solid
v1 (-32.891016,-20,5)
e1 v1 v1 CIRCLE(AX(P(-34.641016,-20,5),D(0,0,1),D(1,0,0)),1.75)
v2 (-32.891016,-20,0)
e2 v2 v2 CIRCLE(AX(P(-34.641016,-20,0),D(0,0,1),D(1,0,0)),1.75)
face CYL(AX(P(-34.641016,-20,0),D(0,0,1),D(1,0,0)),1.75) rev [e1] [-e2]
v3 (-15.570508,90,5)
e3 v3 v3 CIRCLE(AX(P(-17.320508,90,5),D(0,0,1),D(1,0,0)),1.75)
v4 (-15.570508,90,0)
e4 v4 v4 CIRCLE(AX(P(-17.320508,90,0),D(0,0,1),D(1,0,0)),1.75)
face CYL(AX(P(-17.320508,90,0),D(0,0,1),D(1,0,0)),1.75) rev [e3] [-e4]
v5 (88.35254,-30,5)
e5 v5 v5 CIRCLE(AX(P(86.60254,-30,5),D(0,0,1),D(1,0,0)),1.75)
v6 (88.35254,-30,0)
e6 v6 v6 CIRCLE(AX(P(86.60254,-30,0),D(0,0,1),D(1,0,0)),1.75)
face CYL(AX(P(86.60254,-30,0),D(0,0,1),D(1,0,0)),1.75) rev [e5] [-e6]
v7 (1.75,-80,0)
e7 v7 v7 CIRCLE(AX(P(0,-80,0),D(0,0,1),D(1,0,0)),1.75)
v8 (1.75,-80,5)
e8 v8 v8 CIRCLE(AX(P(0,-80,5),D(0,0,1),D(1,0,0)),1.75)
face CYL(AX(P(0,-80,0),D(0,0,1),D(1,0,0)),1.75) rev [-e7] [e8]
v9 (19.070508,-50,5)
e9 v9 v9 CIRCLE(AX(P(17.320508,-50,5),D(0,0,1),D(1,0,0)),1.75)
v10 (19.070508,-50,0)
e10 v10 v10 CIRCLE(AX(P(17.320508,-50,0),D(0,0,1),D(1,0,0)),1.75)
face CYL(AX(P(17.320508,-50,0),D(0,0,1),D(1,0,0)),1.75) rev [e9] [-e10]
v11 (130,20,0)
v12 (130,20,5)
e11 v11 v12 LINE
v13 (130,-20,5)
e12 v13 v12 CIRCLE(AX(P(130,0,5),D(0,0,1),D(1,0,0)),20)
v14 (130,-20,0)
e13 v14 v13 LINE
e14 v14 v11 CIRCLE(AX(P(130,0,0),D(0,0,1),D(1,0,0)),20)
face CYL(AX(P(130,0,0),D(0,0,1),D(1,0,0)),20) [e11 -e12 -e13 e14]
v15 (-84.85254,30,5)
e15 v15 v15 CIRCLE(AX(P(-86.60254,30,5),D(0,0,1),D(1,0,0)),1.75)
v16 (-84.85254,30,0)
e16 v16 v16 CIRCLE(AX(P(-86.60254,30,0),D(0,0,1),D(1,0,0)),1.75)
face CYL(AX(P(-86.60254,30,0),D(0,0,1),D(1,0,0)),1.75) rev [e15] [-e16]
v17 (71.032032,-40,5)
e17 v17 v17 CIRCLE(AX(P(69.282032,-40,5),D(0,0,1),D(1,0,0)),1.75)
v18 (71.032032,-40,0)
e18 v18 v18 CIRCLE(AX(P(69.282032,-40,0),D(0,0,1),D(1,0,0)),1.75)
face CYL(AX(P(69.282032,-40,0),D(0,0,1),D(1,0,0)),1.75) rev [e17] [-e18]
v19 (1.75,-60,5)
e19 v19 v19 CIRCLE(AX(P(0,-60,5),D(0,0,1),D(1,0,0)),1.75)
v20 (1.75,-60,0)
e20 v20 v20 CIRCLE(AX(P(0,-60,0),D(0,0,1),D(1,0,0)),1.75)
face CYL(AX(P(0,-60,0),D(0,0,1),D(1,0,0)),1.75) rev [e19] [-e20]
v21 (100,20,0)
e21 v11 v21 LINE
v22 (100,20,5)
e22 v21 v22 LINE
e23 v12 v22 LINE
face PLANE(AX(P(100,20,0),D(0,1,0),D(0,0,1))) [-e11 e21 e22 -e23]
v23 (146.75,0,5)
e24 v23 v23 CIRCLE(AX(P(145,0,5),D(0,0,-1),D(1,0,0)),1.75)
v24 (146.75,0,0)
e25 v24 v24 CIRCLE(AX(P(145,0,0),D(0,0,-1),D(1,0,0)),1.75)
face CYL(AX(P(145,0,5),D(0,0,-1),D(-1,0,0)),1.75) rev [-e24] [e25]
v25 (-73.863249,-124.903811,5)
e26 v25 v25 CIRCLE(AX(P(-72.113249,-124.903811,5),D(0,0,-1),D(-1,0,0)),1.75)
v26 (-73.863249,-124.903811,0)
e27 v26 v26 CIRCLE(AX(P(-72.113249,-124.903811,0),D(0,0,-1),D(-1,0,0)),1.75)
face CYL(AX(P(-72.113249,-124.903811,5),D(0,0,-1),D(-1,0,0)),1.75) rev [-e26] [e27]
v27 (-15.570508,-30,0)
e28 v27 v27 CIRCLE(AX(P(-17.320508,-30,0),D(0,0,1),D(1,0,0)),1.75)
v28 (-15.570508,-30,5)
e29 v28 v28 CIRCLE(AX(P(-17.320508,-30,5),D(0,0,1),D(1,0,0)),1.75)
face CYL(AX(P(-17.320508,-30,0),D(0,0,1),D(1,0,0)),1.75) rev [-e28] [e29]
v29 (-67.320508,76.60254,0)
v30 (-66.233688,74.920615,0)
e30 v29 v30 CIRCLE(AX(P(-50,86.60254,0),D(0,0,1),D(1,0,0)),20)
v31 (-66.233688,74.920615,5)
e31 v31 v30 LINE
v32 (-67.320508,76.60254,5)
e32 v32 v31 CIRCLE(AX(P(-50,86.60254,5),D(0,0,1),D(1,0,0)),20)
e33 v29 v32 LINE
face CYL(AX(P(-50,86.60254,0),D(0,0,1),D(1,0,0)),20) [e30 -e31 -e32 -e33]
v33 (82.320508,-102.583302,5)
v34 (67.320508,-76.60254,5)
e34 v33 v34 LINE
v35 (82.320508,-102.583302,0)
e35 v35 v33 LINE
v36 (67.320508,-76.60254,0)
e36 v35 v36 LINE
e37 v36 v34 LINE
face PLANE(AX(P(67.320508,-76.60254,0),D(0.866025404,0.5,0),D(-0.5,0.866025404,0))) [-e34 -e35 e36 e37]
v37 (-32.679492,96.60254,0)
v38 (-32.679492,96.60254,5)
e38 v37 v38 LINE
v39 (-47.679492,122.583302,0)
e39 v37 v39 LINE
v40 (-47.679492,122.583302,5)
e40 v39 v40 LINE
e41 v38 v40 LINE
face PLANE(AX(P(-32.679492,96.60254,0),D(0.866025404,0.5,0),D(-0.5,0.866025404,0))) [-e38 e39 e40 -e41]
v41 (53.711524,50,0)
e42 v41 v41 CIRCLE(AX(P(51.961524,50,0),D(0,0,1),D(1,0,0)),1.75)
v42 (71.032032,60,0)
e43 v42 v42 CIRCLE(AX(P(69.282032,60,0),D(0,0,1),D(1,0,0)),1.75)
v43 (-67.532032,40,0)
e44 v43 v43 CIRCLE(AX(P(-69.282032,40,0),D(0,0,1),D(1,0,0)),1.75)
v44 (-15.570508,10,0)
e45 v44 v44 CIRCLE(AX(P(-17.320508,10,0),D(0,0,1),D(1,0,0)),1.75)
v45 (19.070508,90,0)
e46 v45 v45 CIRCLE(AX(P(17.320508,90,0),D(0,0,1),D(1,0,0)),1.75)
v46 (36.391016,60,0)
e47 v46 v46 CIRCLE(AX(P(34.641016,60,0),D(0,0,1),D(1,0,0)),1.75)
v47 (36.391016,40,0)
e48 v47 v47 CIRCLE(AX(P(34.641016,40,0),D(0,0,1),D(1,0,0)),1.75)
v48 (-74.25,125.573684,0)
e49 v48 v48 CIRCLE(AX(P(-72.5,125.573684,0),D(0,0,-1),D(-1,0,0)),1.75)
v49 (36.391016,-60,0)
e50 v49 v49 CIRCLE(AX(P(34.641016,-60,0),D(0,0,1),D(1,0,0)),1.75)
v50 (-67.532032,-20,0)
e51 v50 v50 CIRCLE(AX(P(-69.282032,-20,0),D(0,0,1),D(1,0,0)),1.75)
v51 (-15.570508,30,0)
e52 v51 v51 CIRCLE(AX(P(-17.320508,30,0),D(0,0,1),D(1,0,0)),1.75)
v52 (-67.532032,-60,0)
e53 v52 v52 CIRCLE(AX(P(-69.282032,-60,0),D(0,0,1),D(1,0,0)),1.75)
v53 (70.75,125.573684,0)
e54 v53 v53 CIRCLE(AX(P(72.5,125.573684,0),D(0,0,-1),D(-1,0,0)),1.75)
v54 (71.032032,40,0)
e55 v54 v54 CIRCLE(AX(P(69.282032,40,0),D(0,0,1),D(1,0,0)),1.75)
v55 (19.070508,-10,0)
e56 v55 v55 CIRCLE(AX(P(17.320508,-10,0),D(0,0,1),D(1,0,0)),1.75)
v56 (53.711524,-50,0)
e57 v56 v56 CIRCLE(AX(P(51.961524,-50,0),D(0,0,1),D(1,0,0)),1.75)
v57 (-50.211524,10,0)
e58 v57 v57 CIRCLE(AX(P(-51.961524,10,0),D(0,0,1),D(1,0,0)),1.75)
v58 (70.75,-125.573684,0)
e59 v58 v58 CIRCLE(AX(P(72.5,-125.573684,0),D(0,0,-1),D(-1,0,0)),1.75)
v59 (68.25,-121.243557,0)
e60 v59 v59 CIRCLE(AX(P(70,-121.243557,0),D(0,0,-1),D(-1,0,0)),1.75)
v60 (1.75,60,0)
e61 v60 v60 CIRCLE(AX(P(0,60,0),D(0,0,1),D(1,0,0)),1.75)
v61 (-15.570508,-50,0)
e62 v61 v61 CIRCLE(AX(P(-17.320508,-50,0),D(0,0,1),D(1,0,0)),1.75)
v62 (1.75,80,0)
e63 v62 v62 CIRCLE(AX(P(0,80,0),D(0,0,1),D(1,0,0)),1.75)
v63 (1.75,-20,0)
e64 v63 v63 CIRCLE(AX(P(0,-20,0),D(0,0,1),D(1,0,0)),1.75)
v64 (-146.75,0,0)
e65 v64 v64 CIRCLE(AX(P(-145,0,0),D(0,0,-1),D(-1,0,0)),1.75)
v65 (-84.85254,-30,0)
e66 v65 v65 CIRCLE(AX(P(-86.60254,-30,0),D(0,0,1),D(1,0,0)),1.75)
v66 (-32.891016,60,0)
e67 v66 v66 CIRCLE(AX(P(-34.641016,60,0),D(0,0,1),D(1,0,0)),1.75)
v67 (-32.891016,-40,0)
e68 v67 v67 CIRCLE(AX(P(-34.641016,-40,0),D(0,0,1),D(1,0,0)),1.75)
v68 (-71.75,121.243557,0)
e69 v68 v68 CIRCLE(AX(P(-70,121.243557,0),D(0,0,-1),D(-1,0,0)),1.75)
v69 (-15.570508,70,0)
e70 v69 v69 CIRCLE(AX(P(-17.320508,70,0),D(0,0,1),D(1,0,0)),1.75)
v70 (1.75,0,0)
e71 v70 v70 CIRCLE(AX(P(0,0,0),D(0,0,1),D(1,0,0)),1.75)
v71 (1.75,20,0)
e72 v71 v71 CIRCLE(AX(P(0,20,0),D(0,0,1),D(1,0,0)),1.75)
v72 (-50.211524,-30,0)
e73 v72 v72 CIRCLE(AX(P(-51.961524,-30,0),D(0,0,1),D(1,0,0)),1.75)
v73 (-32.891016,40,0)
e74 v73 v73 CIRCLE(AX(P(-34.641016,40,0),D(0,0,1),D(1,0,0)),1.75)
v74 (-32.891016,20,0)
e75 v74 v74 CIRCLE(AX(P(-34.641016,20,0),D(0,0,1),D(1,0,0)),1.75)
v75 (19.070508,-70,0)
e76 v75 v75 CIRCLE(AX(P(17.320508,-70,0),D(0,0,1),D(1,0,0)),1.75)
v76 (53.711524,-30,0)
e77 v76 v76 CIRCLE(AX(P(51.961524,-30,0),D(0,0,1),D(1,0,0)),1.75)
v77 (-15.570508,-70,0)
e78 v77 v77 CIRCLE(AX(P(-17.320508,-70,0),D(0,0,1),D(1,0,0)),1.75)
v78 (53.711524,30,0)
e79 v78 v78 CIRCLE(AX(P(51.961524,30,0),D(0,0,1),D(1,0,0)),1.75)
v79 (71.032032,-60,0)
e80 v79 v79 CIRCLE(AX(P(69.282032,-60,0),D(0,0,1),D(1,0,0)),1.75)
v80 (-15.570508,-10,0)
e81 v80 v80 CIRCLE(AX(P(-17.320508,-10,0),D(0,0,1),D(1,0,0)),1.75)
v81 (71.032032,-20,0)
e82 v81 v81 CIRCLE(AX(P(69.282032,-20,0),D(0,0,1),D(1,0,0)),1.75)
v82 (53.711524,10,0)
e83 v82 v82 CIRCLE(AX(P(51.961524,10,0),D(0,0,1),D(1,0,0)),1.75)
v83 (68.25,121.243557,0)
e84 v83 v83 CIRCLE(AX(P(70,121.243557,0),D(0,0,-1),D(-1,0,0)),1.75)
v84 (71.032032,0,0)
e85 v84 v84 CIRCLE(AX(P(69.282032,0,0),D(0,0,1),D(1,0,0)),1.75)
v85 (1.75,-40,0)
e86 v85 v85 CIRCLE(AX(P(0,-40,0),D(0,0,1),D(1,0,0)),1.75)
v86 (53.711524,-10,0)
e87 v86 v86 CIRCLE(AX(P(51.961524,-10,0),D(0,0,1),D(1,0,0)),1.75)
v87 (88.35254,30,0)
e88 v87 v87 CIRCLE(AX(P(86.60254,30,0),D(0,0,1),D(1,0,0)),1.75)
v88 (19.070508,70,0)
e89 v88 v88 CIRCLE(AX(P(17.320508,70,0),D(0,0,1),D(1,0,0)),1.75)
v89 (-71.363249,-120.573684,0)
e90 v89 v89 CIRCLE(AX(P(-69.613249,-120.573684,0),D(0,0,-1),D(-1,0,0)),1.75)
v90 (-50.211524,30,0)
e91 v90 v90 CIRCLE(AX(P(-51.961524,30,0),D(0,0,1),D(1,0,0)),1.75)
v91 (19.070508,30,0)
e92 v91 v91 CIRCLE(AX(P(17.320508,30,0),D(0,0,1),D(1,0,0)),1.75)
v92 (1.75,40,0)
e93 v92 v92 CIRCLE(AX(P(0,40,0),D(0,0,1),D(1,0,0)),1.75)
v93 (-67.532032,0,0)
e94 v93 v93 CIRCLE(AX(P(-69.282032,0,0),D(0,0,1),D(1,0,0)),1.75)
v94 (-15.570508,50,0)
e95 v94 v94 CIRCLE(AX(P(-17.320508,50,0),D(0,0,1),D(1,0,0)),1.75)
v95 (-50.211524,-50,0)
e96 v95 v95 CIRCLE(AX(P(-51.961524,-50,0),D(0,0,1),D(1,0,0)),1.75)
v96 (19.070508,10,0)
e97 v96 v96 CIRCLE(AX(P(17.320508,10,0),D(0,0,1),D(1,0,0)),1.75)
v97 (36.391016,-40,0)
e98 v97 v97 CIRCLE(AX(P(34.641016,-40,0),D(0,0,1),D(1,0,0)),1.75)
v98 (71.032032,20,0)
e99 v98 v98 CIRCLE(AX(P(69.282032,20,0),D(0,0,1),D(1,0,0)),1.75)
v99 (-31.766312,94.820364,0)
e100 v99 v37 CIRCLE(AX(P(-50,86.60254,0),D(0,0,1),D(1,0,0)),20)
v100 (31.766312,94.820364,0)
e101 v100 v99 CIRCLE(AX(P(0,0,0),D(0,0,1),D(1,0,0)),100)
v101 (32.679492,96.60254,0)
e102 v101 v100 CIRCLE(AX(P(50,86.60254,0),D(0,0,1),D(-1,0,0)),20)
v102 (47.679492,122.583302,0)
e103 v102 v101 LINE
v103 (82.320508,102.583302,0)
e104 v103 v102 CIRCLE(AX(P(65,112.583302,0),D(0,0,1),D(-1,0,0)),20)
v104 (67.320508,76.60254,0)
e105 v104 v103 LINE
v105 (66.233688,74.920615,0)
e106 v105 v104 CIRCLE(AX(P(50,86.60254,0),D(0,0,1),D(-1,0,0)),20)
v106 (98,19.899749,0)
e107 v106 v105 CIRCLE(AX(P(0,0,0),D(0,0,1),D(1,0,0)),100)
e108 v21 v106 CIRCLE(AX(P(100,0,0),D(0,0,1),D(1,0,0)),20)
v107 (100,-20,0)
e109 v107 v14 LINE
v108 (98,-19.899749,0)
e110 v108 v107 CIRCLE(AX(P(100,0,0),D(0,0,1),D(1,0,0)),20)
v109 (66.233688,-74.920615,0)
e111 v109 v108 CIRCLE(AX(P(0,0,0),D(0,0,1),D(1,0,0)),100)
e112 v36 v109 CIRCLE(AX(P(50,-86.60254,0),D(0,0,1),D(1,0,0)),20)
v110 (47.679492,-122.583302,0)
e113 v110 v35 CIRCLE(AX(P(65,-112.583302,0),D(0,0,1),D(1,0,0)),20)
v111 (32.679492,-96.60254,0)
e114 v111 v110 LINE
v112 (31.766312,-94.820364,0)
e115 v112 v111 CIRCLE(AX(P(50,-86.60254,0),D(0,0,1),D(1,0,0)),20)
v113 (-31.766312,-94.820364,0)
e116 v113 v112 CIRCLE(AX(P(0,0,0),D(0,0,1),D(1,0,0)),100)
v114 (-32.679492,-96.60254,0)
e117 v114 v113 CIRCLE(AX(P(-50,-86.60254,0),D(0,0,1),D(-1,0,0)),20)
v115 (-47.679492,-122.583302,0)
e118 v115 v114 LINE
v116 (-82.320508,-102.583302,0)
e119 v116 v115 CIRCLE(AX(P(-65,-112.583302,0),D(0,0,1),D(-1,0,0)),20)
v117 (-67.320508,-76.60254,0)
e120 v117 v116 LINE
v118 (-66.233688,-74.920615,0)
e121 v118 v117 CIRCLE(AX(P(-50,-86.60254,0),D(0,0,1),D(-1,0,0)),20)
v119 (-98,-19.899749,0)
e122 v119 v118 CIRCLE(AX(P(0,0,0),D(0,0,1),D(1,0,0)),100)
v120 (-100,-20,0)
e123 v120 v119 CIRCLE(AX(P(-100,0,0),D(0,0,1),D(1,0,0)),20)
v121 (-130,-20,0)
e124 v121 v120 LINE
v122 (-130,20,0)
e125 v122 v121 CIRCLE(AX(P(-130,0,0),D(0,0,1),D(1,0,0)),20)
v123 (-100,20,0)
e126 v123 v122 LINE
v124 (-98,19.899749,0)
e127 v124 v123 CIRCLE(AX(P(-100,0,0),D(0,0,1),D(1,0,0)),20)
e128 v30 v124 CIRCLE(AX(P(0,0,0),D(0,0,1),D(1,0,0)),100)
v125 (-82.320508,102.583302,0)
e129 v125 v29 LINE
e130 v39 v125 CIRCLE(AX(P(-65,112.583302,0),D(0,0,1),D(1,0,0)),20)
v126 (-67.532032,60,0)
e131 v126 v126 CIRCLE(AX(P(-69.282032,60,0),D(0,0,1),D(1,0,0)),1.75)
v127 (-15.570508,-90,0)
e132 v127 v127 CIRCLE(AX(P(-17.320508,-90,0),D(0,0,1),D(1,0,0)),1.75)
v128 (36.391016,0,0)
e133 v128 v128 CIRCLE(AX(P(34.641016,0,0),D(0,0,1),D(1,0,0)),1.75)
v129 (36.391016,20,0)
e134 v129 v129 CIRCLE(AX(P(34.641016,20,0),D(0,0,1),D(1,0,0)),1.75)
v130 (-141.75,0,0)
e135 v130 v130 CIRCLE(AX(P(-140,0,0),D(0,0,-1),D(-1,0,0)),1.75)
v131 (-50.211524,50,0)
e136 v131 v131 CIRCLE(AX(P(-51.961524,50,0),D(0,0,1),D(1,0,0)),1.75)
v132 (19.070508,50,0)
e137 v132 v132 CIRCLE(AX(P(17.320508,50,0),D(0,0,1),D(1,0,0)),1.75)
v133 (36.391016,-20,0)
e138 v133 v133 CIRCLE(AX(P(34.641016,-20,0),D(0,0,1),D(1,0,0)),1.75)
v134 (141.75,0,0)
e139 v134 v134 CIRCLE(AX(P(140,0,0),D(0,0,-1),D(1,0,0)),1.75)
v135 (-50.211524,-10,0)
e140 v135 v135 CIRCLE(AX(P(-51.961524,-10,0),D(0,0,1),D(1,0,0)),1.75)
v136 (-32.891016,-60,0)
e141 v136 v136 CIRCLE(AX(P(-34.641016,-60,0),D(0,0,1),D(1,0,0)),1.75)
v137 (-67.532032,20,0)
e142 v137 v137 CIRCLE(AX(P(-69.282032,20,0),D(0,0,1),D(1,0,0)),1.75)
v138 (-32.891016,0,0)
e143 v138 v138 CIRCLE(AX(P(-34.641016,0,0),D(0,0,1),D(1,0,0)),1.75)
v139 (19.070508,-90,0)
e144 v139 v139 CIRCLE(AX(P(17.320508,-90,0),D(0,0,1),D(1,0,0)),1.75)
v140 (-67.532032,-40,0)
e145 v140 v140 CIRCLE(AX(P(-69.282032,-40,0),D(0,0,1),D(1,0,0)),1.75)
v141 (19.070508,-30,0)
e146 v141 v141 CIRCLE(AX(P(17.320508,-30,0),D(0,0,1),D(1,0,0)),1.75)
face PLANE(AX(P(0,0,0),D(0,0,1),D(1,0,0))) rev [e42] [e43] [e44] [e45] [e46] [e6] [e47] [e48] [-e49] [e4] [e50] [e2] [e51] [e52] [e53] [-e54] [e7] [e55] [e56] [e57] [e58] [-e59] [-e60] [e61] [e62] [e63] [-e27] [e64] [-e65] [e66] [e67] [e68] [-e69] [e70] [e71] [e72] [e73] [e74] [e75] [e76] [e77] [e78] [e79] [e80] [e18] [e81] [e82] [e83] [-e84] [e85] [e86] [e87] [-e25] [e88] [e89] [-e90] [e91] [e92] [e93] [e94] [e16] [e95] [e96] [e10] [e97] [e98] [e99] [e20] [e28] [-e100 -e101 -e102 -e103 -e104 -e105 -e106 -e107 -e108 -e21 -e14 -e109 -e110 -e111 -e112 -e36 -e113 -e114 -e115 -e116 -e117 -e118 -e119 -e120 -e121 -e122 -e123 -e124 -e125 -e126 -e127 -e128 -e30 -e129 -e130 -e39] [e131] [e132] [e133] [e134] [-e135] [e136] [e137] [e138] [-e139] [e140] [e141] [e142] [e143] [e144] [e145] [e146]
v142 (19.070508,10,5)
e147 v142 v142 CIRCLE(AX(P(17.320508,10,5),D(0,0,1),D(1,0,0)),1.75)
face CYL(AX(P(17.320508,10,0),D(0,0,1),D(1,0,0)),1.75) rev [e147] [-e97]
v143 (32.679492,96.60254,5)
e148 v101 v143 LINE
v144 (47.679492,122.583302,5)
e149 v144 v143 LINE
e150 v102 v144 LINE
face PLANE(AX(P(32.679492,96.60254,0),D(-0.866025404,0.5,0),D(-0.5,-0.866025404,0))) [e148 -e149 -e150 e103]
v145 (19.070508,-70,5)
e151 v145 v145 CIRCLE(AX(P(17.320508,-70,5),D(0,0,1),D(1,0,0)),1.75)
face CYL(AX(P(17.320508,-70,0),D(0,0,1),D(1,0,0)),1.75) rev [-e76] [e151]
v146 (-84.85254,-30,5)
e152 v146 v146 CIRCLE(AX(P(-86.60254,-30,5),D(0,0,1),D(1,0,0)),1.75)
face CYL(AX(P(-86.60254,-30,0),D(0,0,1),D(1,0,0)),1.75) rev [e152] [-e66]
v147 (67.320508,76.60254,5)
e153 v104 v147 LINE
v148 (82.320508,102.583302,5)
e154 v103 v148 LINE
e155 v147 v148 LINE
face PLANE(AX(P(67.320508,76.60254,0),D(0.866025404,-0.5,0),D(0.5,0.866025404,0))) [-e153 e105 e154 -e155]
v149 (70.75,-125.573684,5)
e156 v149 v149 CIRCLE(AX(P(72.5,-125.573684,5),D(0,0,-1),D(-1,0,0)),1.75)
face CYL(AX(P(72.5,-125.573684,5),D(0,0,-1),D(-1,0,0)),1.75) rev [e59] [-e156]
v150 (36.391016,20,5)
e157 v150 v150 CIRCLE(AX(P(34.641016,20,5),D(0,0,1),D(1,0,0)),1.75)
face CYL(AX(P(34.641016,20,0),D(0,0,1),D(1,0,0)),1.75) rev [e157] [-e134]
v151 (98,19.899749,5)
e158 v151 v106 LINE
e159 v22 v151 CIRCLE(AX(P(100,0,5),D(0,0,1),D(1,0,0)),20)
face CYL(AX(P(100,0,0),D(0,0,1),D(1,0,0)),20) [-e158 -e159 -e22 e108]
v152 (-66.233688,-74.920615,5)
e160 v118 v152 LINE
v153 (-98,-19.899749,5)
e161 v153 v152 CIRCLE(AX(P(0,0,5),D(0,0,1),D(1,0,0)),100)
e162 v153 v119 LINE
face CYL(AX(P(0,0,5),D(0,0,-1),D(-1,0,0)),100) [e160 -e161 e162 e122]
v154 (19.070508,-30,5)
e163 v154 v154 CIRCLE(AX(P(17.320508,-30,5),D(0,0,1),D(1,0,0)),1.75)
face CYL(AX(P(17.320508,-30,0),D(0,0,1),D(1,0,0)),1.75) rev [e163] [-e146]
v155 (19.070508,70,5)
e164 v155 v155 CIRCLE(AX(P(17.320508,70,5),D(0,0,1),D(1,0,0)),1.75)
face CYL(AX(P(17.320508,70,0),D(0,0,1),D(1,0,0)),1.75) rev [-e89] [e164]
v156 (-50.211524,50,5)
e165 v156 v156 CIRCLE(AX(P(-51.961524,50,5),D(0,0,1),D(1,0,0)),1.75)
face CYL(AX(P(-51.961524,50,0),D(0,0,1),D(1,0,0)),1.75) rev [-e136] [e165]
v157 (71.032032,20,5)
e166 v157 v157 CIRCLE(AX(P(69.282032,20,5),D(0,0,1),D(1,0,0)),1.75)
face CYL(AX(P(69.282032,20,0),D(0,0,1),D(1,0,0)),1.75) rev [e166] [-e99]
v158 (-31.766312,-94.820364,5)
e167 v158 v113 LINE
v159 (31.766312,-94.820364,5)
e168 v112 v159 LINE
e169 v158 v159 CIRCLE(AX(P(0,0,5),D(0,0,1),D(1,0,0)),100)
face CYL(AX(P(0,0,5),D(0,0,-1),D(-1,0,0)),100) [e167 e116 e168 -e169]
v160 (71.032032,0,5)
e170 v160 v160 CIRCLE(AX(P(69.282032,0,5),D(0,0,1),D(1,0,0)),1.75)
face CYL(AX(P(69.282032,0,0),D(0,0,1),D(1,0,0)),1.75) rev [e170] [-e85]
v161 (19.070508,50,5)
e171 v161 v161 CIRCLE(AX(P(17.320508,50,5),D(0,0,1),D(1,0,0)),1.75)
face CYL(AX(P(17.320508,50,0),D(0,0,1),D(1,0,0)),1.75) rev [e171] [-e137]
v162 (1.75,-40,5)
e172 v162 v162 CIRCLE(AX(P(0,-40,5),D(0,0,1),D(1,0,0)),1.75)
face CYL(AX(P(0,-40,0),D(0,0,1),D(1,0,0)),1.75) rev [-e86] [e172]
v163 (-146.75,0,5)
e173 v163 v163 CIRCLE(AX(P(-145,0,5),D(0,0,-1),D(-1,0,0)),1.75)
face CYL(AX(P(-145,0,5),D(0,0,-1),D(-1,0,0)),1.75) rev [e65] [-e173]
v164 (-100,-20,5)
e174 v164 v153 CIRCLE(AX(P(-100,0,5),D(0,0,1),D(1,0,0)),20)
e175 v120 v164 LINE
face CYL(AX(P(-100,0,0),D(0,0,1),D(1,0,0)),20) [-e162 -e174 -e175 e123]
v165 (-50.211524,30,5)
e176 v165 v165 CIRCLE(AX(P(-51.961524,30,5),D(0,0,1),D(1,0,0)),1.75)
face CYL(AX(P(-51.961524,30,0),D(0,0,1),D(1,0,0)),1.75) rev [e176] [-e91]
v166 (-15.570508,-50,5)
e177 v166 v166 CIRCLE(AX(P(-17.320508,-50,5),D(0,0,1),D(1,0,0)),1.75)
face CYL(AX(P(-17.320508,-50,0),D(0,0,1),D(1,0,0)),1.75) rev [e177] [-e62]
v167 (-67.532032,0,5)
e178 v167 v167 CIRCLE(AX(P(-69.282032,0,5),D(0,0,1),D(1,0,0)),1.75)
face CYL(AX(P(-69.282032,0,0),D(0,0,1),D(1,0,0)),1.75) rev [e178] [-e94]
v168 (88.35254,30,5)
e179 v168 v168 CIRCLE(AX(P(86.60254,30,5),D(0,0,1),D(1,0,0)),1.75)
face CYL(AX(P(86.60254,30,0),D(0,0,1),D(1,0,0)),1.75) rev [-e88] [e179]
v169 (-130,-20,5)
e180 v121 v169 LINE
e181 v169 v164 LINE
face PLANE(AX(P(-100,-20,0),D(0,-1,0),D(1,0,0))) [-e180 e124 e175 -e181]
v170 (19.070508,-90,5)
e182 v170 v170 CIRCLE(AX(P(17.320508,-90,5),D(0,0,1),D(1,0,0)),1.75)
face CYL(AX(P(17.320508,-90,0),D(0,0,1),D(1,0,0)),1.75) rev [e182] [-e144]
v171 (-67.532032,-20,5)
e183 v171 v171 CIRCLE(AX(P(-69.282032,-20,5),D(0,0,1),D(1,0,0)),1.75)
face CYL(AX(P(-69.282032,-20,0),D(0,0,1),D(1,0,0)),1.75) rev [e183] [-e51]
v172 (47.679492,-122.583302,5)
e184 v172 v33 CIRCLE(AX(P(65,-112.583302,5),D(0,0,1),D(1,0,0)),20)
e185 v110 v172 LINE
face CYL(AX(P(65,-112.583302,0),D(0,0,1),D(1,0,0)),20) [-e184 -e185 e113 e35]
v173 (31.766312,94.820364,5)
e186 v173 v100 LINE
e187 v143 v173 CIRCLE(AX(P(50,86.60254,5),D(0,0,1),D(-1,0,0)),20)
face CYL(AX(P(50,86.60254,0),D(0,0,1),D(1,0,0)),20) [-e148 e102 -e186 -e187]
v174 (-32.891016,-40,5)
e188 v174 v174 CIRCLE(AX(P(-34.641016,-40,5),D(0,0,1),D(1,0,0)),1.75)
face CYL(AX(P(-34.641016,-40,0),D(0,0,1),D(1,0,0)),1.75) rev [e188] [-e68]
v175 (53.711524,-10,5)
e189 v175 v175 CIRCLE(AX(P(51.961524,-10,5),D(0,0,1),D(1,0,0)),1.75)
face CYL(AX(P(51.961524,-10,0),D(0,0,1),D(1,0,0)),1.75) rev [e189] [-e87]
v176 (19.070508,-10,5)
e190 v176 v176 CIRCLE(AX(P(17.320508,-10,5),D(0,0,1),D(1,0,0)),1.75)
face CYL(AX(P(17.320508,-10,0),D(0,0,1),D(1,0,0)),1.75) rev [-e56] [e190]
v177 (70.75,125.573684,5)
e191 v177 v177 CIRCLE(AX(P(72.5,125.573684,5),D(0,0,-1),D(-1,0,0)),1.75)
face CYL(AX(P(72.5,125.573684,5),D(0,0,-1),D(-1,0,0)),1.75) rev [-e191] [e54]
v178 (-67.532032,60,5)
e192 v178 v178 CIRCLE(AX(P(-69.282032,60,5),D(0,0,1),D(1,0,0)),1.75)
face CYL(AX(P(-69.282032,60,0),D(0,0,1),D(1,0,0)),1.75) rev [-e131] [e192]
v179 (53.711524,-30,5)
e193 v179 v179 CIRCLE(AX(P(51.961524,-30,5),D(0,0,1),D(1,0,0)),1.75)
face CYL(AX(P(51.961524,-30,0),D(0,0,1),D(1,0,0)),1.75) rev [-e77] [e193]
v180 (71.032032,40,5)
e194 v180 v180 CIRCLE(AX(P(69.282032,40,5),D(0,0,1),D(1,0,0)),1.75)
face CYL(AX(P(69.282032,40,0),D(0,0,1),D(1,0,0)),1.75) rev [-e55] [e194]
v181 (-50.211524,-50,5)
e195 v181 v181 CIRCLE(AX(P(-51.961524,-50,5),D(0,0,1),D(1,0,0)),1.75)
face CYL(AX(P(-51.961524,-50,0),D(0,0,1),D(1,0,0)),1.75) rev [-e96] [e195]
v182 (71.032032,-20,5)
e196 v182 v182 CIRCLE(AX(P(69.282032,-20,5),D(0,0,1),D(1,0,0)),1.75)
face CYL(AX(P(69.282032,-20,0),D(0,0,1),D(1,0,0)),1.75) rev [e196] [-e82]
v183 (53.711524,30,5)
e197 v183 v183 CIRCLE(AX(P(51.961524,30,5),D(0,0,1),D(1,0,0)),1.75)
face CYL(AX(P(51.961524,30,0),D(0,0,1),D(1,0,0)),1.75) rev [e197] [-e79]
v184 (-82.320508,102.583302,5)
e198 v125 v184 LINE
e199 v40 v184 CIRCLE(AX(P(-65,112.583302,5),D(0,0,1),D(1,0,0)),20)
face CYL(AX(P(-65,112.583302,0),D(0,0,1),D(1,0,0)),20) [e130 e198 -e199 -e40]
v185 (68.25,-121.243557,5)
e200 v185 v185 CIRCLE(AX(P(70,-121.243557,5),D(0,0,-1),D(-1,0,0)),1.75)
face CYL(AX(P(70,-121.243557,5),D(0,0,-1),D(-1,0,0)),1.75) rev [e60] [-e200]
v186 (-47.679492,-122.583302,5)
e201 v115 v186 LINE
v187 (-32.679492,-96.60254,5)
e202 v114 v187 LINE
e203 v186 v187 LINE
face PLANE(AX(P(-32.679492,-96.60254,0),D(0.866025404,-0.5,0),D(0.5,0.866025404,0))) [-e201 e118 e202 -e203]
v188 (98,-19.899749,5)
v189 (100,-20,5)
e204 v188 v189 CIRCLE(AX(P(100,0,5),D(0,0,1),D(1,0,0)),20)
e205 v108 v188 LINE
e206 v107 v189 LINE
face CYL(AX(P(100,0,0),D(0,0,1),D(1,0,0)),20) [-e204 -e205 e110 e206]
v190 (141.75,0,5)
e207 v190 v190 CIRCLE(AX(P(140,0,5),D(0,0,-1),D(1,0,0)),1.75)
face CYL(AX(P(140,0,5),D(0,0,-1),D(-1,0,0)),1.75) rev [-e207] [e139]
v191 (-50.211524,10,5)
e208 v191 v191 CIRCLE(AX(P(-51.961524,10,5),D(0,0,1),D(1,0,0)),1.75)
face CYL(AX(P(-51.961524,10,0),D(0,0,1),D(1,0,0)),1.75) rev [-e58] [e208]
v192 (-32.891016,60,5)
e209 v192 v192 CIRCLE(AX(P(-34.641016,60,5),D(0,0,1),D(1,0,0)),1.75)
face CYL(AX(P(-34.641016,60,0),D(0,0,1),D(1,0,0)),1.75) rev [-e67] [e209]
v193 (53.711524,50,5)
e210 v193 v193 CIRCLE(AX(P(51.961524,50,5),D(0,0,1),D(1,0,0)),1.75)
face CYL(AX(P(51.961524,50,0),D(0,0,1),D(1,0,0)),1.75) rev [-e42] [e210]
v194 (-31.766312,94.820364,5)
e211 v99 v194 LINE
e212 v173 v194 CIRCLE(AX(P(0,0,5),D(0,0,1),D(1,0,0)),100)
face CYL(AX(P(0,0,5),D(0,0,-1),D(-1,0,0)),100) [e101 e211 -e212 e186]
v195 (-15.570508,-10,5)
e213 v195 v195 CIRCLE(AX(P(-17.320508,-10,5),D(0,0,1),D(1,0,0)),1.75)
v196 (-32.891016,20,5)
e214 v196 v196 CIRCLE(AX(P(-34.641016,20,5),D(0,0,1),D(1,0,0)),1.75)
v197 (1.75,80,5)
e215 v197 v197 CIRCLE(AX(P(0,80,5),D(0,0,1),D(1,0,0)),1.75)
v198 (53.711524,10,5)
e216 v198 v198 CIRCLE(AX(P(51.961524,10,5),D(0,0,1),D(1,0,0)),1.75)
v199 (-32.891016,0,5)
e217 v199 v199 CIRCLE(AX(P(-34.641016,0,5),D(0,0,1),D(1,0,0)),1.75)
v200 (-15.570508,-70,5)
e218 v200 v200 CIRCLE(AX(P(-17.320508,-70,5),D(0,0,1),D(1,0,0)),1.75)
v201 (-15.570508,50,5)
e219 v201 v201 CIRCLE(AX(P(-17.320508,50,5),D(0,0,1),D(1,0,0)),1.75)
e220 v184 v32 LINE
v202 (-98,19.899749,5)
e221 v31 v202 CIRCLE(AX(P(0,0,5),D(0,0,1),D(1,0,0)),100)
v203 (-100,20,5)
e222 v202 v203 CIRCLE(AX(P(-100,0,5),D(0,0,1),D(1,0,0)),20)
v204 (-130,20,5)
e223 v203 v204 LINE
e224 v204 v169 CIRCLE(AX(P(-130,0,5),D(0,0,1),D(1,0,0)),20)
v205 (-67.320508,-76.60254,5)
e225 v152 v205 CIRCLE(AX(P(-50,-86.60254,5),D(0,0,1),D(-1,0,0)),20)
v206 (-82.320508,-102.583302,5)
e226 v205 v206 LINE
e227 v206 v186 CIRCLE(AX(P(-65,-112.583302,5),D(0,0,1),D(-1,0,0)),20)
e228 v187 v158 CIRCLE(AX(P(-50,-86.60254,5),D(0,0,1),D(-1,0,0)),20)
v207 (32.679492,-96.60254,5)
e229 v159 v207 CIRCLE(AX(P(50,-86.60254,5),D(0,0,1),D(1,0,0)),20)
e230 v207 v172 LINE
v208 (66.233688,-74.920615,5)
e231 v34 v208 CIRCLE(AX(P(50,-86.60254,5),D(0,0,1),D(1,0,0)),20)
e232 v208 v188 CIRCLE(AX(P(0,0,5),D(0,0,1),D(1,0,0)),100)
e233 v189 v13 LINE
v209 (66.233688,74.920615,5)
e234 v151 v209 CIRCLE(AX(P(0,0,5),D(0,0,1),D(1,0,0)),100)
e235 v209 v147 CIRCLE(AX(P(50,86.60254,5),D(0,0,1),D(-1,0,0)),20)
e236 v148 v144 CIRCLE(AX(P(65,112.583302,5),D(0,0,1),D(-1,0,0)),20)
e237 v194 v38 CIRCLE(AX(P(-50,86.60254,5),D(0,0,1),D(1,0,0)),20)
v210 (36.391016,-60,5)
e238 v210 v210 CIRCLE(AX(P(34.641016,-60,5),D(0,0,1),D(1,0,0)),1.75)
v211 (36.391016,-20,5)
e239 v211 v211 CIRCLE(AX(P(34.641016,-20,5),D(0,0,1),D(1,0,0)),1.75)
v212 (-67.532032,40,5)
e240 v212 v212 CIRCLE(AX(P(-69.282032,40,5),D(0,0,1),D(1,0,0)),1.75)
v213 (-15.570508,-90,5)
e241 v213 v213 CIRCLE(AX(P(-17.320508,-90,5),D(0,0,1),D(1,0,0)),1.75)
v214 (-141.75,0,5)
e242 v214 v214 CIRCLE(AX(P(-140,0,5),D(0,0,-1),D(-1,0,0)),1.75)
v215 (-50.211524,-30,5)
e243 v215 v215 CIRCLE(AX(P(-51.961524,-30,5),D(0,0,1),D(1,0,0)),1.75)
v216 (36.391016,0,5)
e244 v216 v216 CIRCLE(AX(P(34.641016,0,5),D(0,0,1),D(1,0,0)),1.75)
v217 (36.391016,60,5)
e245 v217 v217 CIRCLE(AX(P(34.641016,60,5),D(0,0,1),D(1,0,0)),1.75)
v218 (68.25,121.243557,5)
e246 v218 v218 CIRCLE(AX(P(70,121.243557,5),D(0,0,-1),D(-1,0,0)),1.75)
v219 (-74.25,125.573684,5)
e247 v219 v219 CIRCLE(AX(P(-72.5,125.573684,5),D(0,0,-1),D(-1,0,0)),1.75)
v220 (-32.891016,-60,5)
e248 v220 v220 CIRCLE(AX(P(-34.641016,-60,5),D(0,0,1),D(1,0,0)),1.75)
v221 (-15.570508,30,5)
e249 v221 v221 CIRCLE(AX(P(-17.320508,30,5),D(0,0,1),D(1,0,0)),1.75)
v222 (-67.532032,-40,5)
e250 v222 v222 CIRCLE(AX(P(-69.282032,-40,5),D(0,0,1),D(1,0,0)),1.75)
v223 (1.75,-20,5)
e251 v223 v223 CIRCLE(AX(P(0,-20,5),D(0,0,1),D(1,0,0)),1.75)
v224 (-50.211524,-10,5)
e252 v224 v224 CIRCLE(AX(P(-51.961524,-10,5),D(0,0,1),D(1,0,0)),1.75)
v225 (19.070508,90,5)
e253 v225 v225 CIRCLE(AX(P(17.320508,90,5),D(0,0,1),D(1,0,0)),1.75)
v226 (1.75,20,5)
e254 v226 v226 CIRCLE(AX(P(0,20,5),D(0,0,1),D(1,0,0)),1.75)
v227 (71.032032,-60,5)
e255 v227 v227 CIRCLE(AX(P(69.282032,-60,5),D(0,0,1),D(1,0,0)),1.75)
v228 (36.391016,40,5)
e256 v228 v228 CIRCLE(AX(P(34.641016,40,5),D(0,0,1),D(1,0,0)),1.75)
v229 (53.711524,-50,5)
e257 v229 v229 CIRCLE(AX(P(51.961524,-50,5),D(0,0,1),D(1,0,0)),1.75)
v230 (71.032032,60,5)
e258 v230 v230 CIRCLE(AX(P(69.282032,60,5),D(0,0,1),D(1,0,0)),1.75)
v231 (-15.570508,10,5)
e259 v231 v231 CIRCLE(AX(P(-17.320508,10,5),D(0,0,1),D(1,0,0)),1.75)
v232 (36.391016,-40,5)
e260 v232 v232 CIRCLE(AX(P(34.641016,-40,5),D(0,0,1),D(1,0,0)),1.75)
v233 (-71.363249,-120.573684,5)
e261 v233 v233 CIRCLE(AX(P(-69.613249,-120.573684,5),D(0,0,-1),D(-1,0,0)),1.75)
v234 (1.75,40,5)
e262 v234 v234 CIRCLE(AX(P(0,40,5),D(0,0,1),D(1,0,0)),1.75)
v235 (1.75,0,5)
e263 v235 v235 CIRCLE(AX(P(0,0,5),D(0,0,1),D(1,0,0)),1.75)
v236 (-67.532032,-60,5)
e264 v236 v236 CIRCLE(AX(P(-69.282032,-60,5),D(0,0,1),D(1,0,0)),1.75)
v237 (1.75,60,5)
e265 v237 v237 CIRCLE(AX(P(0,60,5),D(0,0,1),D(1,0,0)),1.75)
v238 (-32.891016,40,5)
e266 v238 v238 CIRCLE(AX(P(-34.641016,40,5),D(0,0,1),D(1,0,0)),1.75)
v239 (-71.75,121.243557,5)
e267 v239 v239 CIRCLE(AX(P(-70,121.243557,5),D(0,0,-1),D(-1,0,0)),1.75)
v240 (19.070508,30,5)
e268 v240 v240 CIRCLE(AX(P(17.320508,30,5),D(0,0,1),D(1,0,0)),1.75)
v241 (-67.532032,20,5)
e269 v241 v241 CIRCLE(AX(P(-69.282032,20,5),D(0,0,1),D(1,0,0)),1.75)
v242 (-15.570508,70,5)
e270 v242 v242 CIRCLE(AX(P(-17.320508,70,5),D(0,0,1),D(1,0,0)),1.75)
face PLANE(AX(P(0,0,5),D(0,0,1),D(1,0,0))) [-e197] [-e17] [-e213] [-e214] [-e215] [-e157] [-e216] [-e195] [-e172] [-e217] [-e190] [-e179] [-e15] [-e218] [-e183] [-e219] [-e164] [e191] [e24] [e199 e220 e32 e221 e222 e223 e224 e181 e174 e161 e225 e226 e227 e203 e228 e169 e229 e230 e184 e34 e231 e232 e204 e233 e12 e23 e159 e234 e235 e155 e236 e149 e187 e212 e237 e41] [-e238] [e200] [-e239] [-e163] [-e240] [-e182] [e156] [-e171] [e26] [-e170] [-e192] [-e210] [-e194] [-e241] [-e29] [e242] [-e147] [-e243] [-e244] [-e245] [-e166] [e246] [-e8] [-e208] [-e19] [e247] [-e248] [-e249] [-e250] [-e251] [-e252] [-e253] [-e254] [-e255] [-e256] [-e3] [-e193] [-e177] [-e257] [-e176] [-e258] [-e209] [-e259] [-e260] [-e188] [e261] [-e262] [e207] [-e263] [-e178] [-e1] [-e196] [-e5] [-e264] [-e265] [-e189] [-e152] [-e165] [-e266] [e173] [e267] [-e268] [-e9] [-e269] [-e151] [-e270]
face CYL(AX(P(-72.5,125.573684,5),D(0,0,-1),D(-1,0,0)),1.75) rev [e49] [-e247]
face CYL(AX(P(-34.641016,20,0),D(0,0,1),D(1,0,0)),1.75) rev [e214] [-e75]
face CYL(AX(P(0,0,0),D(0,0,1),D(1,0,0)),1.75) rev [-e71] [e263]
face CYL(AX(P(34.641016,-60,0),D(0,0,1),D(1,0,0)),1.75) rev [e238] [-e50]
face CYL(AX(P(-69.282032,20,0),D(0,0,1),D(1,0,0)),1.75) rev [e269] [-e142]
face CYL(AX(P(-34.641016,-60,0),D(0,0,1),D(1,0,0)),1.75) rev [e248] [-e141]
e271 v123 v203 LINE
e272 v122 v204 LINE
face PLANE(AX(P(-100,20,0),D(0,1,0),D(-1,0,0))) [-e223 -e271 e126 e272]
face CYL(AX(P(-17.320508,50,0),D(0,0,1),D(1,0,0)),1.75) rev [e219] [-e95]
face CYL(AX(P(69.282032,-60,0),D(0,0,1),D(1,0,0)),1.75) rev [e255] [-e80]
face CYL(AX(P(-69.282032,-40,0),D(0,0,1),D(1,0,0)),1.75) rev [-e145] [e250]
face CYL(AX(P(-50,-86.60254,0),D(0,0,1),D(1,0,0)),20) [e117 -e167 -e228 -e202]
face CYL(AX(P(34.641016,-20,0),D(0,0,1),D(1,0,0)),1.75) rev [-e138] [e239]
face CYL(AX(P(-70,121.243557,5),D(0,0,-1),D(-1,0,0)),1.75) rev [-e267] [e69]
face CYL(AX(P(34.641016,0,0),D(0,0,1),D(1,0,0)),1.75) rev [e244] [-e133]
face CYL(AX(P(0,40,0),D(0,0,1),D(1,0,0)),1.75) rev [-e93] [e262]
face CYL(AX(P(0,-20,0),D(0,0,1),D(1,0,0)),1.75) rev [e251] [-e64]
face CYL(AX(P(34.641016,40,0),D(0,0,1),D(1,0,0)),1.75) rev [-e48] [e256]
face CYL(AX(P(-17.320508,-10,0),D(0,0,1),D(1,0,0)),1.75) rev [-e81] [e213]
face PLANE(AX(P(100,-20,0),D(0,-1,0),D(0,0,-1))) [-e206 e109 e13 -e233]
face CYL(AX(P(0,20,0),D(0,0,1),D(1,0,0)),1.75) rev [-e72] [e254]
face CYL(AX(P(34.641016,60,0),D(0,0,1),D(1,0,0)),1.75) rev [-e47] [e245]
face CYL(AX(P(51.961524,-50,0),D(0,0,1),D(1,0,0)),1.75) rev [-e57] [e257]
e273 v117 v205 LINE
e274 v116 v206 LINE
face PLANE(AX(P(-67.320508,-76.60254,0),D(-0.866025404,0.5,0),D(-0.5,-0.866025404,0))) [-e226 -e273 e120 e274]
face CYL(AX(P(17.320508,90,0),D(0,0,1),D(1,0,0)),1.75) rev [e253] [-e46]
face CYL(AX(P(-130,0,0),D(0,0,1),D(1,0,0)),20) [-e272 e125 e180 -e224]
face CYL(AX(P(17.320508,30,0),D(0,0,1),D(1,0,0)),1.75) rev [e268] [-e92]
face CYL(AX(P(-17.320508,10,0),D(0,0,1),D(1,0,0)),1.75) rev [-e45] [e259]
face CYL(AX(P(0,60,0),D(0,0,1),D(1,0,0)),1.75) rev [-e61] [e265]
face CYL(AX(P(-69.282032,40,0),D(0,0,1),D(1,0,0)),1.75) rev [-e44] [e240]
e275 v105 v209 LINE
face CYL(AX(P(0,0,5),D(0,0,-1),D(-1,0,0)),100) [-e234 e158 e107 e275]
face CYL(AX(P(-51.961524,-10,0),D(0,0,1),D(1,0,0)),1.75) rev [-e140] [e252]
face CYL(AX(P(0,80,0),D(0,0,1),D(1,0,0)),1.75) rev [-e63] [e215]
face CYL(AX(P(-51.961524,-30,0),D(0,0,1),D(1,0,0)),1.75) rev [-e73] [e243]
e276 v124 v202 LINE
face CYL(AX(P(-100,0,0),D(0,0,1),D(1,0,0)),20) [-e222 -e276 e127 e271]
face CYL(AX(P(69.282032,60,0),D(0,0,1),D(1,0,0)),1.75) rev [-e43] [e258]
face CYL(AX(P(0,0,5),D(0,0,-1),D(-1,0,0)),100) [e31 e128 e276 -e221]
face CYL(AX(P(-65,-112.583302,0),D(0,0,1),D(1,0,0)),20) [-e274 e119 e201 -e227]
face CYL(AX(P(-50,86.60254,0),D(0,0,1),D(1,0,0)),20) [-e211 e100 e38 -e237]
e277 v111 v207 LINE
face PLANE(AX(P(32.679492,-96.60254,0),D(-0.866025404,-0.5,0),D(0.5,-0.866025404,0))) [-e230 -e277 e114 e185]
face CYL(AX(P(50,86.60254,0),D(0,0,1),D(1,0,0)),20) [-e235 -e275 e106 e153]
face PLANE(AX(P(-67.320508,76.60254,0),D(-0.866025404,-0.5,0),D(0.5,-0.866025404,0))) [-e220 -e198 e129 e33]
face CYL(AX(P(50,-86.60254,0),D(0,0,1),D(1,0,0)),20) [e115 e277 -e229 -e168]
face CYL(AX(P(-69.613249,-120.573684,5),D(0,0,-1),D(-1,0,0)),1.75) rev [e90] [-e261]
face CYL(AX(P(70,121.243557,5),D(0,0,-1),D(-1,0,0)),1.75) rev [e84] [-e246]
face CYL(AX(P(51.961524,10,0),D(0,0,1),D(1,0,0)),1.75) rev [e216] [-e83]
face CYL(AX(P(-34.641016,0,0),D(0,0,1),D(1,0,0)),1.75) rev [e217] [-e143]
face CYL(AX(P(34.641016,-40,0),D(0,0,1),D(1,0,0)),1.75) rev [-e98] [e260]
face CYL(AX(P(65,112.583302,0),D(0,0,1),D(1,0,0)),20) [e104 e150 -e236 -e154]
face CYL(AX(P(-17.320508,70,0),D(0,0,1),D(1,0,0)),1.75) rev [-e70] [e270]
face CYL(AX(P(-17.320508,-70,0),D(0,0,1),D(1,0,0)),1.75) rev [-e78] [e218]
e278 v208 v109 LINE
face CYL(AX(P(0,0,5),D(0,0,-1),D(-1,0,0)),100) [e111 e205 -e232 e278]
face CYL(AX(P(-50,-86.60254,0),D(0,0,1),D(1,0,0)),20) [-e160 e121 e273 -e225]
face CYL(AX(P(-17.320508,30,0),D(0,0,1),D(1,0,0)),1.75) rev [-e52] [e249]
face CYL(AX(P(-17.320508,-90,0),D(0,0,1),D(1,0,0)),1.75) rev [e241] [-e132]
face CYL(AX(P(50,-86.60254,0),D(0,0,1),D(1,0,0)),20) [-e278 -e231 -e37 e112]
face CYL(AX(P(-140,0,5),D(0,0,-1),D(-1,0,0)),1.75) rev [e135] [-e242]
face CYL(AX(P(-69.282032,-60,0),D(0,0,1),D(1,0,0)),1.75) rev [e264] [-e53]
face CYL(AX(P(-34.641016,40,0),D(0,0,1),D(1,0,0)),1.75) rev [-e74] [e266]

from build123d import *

# Parameters (mm, degrees)
SKETCH4_R               = 100
BOSS_EXTRUDE2_DEPTH     = 5
SKETCH5_R               = 1.75
CUT_EXTRUDE2_DEPTH      = 5
FILL_PATTERN2_OUTLINE_R = 1.75
FILL_PATTERN2_DEPTH     = 5
BOSS_EXTRUDE3_DEPTH     = 5
SKETCH10_R              = 1.75
CUT_EXTRUDE3_DEPTH      = 201.258163628


# Read off the part's stored shape, not the designer's step: Fill Pattern2
with BuildPart() as part:
    # Sketch4 → Boss-Extrude2 (new body)
    with BuildSketch(Plane.XY):
        Circle(SKETCH4_R)
    extrude(amount=BOSS_EXTRUDE2_DEPTH)

    # Sketch5 → Cut-Extrude2 (cut)
    with BuildSketch(Plane.XY.offset(5)):
        Circle(SKETCH5_R)
    extrude(amount=-CUT_EXTRUDE2_DEPTH, mode=Mode.SUBTRACT)

    # Fill Pattern2 outline → Fill Pattern2 (cut)
    with BuildSketch(Plane.XY):
        with Locations((17.320508076, 90)):
            Circle(FILL_PATTERN2_OUTLINE_R)
        with Locations((-86.602540378, -30)):
            Circle(FILL_PATTERN2_OUTLINE_R)
        with Locations((-69.282032303, -40)):
            Circle(FILL_PATTERN2_OUTLINE_R)
        with Locations((-51.961524227, -50)):
            Circle(FILL_PATTERN2_OUTLINE_R)
        with Locations((-34.641016151, -60)):
            Circle(FILL_PATTERN2_OUTLINE_R)
        with Locations((-69.282032303, -60)):
            Circle(FILL_PATTERN2_OUTLINE_R)
        with Locations((17.320508076, -90)):
            Circle(FILL_PATTERN2_OUTLINE_R)
        with Locations((0, -80)):
            Circle(FILL_PATTERN2_OUTLINE_R)
        with Locations((-17.320508076, -70)):
            Circle(FILL_PATTERN2_OUTLINE_R)
        with Locations((34.641016151, -80)):
            Circle(FILL_PATTERN2_OUTLINE_R)
        with Locations((17.320508076, -70)):
            Circle(FILL_PATTERN2_OUTLINE_R)
        with Locations((0, -60)):
            Circle(FILL_PATTERN2_OUTLINE_R)
        with Locations((-17.320508076, -50)):
            Circle(FILL_PATTERN2_OUTLINE_R)
        with Locations((-34.641016151, -40)):
            Circle(FILL_PATTERN2_OUTLINE_R)
        with Locations((-51.961524227, -30)):
            Circle(FILL_PATTERN2_OUTLINE_R)
        with Locations((-69.282032303, -20)):
            Circle(FILL_PATTERN2_OUTLINE_R)
        with Locations((-86.602540378, -10)):
            Circle(FILL_PATTERN2_OUTLINE_R)
        with Locations((-51.961524227, -70)):
            Circle(FILL_PATTERN2_OUTLINE_R)
        with Locations((-34.641016151, -80)):
            Circle(FILL_PATTERN2_OUTLINE_R)
        with Locations((-17.320508076, -90)):
            Circle(FILL_PATTERN2_OUTLINE_R)
        with Locations((34.641016151, 20)):
            Circle(FILL_PATTERN2_OUTLINE_R)
        with Locations((17.320508076, 30)):
            Circle(FILL_PATTERN2_OUTLINE_R)
        with Locations((0, 40)):
            Circle(FILL_PATTERN2_OUTLINE_R)
        with Locations((-17.320508076, 50)):
            Circle(FILL_PATTERN2_OUTLINE_R)
        with Locations((-34.641016151, 60)):
            Circle(FILL_PATTERN2_OUTLINE_R)
        with Locations((-51.961524227, 70)):
            Circle(FILL_PATTERN2_OUTLINE_R)
        with Locations((86.602540378, 10)):
            Circle(FILL_PATTERN2_OUTLINE_R)
        with Locations((69.282032303, 20)):
            Circle(FILL_PATTERN2_OUTLINE_R)
        with Locations((0, 20)):
            Circle(FILL_PATTERN2_OUTLINE_R)
        with Locations((-17.320508076, 30)):
            Circle(FILL_PATTERN2_OUTLINE_R)
        with Locations((-34.641016151, 40)):
            Circle(FILL_PATTERN2_OUTLINE_R)
        with Locations((-51.961524227, 50)):
            Circle(FILL_PATTERN2_OUTLINE_R)
        with Locations((51.961524227, 10)):
            Circle(FILL_PATTERN2_OUTLINE_R)
        with Locations((69.282032303, 0)):
            Circle(FILL_PATTERN2_OUTLINE_R)
        with Locations((86.602540378, -10)):
            Circle(FILL_PATTERN2_OUTLINE_R)
        with Locations((-69.282032303, 60)):
            Circle(FILL_PATTERN2_OUTLINE_R)
        with Locations((51.961524227, 50)):
            Circle(FILL_PATTERN2_OUTLINE_R)
        with Locations((34.641016151, 60)):
            Circle(FILL_PATTERN2_OUTLINE_R)
        with Locations((17.320508076, 70)):
            Circle(FILL_PATTERN2_OUTLINE_R)
        with Locations((0, 80)):
            Circle(FILL_PATTERN2_OUTLINE_R)
        with Locations((34.641016151, 80)):
            Circle(FILL_PATTERN2_OUTLINE_R)
        with Locations((51.961524227, 70)):
            Circle(FILL_PATTERN2_OUTLINE_R)
        with Locations((69.282032303, 60)):
            Circle(FILL_PATTERN2_OUTLINE_R)
        with Locations((-17.320508076, 90)):
            Circle(FILL_PATTERN2_OUTLINE_R)
        with Locations((51.961524227, 30)):
            Circle(FILL_PATTERN2_OUTLINE_R)
        with Locations((34.641016151, 40)):
            Circle(FILL_PATTERN2_OUTLINE_R)
        with Locations((17.320508076, 50)):
            Circle(FILL_PATTERN2_OUTLINE_R)
        with Locations((0, 60)):
            Circle(FILL_PATTERN2_OUTLINE_R)
        with Locations((-17.320508076, 70)):
            Circle(FILL_PATTERN2_OUTLINE_R)
        with Locations((-34.641016151, 80)):
            Circle(FILL_PATTERN2_OUTLINE_R)
        with Locations((86.602540378, 30)):
            Circle(FILL_PATTERN2_OUTLINE_R)
        with Locations((69.282032303, 40)):
            Circle(FILL_PATTERN2_OUTLINE_R)
        with Locations((34.641016151, -40)):
            Circle(FILL_PATTERN2_OUTLINE_R)
        with Locations((51.961524227, -50)):
            Circle(FILL_PATTERN2_OUTLINE_R)
        with Locations((69.282032303, -60)):
            Circle(FILL_PATTERN2_OUTLINE_R)
        with Locations((-86.602540378, 10)):
            Circle(FILL_PATTERN2_OUTLINE_R)
        with Locations((17.320508076, -30)):
            Circle(FILL_PATTERN2_OUTLINE_R)
        with Locations((0, -20)):
            Circle(FILL_PATTERN2_OUTLINE_R)
        with Locations((-17.320508076, -10)):
            Circle(FILL_PATTERN2_OUTLINE_R)
        with Locations((-34.641016151, 0)):
            Circle(FILL_PATTERN2_OUTLINE_R)
        with Locations((-69.282032303, 0)):
            Circle(FILL_PATTERN2_OUTLINE_R)
        with Locations((-51.961524227, -10)):
            Circle(FILL_PATTERN2_OUTLINE_R)
        with Locations((-34.641016151, -20)):
            Circle(FILL_PATTERN2_OUTLINE_R)
        with Locations((-17.320508076, -30)):
            Circle(FILL_PATTERN2_OUTLINE_R)
        with Locations((0, -40)):
            Circle(FILL_PATTERN2_OUTLINE_R)
        with Locations((17.320508076, -50)):
            Circle(FILL_PATTERN2_OUTLINE_R)
        with Locations((34.641016151, -60)):
            Circle(FILL_PATTERN2_OUTLINE_R)
        with Locations((51.961524227, -70)):
            Circle(FILL_PATTERN2_OUTLINE_R)
        with Locations((86.602540378, -30)):
            Circle(FILL_PATTERN2_OUTLINE_R)
        with Locations((-69.282032303, 40)):
            Circle(FILL_PATTERN2_OUTLINE_R)
        with Locations((-51.961524227, 30)):
            Circle(FILL_PATTERN2_OUTLINE_R)
        with Locations((-34.641016151, 20)):
            Circle(FILL_PATTERN2_OUTLINE_R)
        with Locations((69.282032303, -20)):
            Circle(FILL_PATTERN2_OUTLINE_R)
        with Locations((51.961524227, -10)):
            Circle(FILL_PATTERN2_OUTLINE_R)
        with Locations((34.641016151, 0)):
            Circle(FILL_PATTERN2_OUTLINE_R)
        with Locations((17.320508076, 10)):
            Circle(FILL_PATTERN2_OUTLINE_R)
        with Locations((69.282032303, -40)):
            Circle(FILL_PATTERN2_OUTLINE_R)
        with Locations((-86.602540378, 30)):
            Circle(FILL_PATTERN2_OUTLINE_R)
        with Locations((-69.282032303, 20)):
            Circle(FILL_PATTERN2_OUTLINE_R)
        with Locations((-51.961524227, 10)):
            Circle(FILL_PATTERN2_OUTLINE_R)
        with Locations((51.961524227, -30)):
            Circle(FILL_PATTERN2_OUTLINE_R)
        with Locations((34.641016151, -20)):
            Circle(FILL_PATTERN2_OUTLINE_R)
        with Locations((17.320508076, -10)):
            Circle(FILL_PATTERN2_OUTLINE_R)
        with Locations((-17.320508076, 10)):
            Circle(FILL_PATTERN2_OUTLINE_R)
    extrude(amount=FILL_PATTERN2_DEPTH, mode=Mode.SUBTRACT)

    # Sketch9 → Boss-Extrude3 (add)
    with BuildSketch(Plane.XY.offset(5)):
        with BuildLine():
            Line((67.320508076, -76.602540378), (82.320508076, -102.583302492))
            ThreePointArc((82.320508076, -102.583302492), (75, -129.903810568), (47.679491924, -122.583302492))
            Line((47.679491924, -122.583302492), (32.679491924, -96.602540378))
            ThreePointArc((32.679491924, -96.602540378), (40, -69.282032303), (67.320508076, -76.602540378))
        make_face()
        with BuildLine():
            Line((-67.320508076, -76.602540378), (-82.320508076, -102.583302492))
            ThreePointArc((-82.320508076, -102.583302492), (-75, -129.903810568), (-47.679491924, -122.583302492))
            Line((-47.679491924, -122.583302492), (-32.679491924, -96.602540378))
            ThreePointArc((-32.679491924, -96.602540378), (-40, -69.282032303), (-67.320508076, -76.602540378))
        make_face()
        with BuildLine():
            Line((-100, -20), (-130, -20))
            ThreePointArc((-130, -20), (-150, 0), (-130, 20))
            Line((-130, 20), (-100, 20))
            ThreePointArc((-100, 20), (-80, 0), (-100, -20))
        make_face()
        with BuildLine():
            Line((67.320508076, 76.602540378), (82.320508076, 102.583302492))
            ThreePointArc((82.320508076, 102.583302492), (75, 129.903810568), (47.679491924, 122.583302492))
            Line((47.679491924, 122.583302492), (32.679491924, 96.602540378))
            ThreePointArc((32.679491924, 96.602540378), (40, 69.282032303), (67.320508076, 76.602540378))
        make_face()
        with BuildLine():
            Line((-67.320508076, 76.602540378), (-82.320508076, 102.583302492))
            ThreePointArc((-82.320508076, 102.583302492), (-75, 129.903810568), (-47.679491924, 122.583302492))
            Line((-47.679491924, 122.583302492), (-32.679491924, 96.602540378))
            ThreePointArc((-32.679491924, 96.602540378), (-40, 69.282032303), (-67.320508076, 76.602540378))
        make_face()
        with BuildLine():
            Line((100, 20), (130, 20))
            ThreePointArc((130, 20), (150, 0), (130, -20))
            Line((130, -20), (100, -20))
            ThreePointArc((100, -20), (80, 0), (100, 20))
        make_face()
    extrude(amount=-BOSS_EXTRUDE3_DEPTH)

    # Sketch10 → Cut-Extrude3 (cut, through all)
    with BuildSketch(Plane(origin=(0, 0, 0), x_dir=(-1, 0, 0), z_dir=(0, 0, -1))):
        with Locations((145, 0)):
            Circle(SKETCH10_R)
        with Locations((140, 0)):
            Circle(SKETCH10_R)
        with Locations((72.5, 125.573683549)):
            Circle(SKETCH10_R)
        with Locations((70, 121.24355653)):
            Circle(SKETCH10_R)
        with Locations(Location((-140, 0, 0), (0, 0, 180))):
            Circle(SKETCH10_R)
        with Locations(Location((-145, 0, 0), (0, 0, 180))):
            Circle(SKETCH10_R)
        with Locations((72.113248654, -124.903810568)):
            Circle(SKETCH10_R)
        with Locations((69.613248654, -120.573683549)):
            Circle(SKETCH10_R)
        with Locations((-72.5, 125.573683549)):
            Circle(SKETCH10_R)
        with Locations((-70, 121.24355653)):
            Circle(SKETCH10_R)
        with Locations((-72.5, -125.573683549)):
            Circle(SKETCH10_R)
        with Locations((-70, -121.24355653)):
            Circle(SKETCH10_R)
    extrude(amount=-CUT_EXTRUDE3_DEPTH, mode=Mode.SUBTRACT)


solid = part.part
